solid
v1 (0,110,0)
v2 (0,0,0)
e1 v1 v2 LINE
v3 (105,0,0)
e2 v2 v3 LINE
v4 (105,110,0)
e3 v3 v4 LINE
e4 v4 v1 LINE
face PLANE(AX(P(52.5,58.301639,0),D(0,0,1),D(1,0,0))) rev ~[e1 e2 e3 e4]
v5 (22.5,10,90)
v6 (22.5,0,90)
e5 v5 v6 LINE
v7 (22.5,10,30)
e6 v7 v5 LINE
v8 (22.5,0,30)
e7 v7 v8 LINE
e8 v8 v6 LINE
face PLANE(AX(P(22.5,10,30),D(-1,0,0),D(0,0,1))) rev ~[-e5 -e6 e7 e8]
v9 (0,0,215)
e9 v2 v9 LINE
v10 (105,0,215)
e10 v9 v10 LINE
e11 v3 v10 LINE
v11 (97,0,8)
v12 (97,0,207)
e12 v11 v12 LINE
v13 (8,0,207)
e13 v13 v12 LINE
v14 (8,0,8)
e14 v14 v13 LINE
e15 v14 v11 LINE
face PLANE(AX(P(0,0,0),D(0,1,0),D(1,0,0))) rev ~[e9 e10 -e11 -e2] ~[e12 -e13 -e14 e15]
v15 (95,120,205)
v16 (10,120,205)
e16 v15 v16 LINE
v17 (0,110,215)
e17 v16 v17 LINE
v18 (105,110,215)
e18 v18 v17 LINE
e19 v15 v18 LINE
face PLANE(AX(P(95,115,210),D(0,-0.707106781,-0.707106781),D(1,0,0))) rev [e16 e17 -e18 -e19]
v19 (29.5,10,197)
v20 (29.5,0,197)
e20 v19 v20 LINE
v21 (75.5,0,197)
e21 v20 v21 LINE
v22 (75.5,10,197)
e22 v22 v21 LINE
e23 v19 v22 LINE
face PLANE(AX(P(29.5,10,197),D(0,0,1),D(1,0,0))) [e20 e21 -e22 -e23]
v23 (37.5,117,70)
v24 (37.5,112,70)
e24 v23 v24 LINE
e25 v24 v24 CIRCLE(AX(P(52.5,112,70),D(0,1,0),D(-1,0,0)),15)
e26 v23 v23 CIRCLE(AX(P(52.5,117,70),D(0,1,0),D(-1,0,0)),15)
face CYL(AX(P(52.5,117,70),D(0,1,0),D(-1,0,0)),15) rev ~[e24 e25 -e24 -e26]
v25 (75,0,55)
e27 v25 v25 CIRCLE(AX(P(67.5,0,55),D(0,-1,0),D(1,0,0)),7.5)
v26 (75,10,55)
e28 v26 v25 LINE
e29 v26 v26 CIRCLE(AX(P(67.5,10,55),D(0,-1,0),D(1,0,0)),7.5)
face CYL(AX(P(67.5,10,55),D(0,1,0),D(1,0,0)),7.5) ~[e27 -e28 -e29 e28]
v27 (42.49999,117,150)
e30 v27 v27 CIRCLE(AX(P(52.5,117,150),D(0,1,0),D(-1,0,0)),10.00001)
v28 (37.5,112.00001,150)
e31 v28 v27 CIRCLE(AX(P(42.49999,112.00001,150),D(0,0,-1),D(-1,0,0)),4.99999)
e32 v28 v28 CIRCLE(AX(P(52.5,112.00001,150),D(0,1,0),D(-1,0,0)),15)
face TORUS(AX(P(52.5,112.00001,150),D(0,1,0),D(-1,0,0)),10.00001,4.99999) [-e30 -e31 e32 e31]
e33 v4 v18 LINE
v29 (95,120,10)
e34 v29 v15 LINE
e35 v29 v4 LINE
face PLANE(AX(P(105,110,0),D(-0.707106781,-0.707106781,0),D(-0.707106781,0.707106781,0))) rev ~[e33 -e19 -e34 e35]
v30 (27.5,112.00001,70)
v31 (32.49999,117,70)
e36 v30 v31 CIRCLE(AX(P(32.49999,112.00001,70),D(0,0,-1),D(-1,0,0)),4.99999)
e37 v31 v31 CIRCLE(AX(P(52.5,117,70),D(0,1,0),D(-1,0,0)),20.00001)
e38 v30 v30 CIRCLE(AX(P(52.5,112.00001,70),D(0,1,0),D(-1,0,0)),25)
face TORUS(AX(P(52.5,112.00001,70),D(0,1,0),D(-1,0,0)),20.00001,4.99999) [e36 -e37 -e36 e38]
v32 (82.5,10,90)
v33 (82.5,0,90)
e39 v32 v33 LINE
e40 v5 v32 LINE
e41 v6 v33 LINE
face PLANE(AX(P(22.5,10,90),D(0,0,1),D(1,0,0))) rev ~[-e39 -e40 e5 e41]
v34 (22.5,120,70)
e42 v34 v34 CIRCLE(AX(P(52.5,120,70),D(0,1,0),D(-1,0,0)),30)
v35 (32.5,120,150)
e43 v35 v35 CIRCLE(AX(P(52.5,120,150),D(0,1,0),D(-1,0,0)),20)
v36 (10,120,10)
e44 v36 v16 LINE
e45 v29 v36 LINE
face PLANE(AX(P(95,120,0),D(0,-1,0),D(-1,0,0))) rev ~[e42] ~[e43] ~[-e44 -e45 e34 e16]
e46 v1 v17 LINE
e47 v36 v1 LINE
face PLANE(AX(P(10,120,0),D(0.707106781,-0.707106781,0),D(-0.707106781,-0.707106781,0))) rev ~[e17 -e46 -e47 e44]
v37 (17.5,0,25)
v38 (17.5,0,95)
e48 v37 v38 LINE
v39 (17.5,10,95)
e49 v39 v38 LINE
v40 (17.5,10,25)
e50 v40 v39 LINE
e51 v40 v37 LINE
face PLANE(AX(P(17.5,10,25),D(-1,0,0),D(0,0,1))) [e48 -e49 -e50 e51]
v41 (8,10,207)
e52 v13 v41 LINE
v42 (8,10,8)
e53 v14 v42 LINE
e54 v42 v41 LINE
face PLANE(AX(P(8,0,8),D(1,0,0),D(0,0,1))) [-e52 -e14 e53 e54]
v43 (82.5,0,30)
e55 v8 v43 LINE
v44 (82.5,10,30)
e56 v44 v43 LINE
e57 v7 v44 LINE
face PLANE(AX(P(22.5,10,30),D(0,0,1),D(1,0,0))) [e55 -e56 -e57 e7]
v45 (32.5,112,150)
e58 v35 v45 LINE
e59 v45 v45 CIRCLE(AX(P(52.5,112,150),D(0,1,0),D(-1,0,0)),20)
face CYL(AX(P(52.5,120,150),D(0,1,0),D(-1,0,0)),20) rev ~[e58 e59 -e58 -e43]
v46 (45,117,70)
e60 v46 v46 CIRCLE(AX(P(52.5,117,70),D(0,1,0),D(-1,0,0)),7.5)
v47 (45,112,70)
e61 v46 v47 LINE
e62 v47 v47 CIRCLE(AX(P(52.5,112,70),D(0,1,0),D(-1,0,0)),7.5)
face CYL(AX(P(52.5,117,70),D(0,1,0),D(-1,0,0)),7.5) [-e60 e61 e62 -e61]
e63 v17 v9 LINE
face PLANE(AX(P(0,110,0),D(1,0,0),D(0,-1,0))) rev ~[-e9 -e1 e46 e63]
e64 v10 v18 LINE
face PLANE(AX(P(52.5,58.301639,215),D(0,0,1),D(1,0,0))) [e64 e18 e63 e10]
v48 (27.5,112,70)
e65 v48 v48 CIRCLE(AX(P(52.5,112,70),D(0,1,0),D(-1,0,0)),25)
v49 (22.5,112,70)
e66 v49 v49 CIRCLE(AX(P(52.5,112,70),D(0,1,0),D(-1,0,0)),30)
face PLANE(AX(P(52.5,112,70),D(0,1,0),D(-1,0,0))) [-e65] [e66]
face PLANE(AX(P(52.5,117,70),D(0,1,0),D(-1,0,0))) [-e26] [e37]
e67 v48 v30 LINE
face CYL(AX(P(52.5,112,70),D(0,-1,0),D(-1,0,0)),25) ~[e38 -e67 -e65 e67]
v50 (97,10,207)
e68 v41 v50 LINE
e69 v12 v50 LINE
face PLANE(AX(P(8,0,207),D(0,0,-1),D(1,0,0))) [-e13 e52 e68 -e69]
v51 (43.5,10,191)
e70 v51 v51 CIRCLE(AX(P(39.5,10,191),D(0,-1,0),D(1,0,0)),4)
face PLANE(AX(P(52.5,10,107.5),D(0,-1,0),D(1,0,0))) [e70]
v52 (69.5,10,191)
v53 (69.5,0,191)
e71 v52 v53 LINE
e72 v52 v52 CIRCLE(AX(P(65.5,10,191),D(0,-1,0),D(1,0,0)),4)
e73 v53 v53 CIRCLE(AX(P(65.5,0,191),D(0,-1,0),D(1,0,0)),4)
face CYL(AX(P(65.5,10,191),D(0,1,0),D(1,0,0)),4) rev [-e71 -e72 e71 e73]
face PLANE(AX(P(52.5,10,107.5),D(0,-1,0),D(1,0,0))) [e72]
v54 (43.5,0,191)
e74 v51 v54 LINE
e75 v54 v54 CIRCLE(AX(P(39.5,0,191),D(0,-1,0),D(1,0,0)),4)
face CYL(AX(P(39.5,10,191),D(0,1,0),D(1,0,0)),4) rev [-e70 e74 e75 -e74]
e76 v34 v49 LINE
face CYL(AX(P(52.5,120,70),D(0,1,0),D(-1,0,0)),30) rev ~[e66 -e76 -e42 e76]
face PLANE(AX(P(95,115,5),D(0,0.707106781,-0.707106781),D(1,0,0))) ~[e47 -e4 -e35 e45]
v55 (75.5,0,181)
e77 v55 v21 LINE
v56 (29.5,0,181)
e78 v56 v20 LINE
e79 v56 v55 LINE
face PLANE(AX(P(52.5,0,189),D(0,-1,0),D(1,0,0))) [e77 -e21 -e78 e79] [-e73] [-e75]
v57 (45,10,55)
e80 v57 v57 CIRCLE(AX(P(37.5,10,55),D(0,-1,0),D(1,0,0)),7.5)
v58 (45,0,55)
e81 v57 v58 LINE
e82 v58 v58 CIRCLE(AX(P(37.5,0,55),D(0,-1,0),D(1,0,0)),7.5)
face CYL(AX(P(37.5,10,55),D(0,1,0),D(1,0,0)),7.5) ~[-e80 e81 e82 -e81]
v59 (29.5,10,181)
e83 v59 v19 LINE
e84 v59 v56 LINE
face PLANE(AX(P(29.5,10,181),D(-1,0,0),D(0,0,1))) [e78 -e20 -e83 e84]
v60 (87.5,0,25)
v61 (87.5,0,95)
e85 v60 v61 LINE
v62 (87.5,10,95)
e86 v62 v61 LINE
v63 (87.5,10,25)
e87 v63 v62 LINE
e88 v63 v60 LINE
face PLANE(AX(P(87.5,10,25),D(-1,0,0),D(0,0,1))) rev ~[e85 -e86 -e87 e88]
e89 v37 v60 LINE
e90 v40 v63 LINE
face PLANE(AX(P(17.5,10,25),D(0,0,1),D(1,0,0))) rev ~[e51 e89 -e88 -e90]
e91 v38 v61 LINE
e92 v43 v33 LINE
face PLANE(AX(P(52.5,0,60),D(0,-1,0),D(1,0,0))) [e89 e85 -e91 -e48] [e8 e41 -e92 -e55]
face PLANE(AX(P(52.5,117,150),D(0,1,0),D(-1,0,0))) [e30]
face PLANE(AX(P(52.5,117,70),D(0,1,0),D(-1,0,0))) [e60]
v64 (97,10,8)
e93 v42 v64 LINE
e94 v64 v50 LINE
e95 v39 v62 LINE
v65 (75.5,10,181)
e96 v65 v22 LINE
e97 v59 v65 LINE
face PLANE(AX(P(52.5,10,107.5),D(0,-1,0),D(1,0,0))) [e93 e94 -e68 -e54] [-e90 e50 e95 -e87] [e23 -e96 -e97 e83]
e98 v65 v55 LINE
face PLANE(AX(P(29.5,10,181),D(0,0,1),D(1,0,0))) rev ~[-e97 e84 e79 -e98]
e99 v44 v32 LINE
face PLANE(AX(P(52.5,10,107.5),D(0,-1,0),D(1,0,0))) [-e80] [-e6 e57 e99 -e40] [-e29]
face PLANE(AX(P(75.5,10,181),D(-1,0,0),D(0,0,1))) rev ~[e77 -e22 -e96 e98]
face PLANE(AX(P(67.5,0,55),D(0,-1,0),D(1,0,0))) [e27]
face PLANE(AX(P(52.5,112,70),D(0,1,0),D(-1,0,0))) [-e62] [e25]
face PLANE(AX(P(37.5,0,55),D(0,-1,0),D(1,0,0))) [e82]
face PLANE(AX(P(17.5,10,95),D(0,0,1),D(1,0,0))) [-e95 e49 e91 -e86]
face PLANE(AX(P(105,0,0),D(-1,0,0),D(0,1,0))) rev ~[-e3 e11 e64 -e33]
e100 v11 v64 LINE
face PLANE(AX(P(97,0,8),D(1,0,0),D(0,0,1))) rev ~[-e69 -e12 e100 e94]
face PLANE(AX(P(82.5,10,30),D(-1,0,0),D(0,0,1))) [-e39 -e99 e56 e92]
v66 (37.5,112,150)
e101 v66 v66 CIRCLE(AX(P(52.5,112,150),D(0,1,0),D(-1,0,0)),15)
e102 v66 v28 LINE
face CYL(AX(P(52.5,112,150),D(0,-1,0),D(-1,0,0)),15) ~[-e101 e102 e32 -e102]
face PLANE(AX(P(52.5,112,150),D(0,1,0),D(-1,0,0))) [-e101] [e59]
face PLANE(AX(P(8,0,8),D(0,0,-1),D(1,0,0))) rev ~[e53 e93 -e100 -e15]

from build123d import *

# Parameters (mm, degrees)
F1_DEPTH  = 215
F2_SIZE   = 10
F3_R      = 20
F3_R_2    = 30
F4_DEPTH  = 8
F5_R      = 15
F5_R_2    = 25
F6_DEPTH  = 5
F7_R      = 4.99999
F8_R      = 15
F8_R_2    = 7.5
F9_DEPTH  = 5
F10_W     = 89
F10_H     = 199
F11_DEPTH = 10
F12_W     = 46
F12_H     = 16
F12_R     = 4
F13_DEPTH = 10
F14_W     = 70
F14_H     = 70
F14_W_2   = 60
F14_H_2   = 60
F14_R     = 7.5
F15_DEPTH = 10


# Not quite as in the source:
# - a fillet or chamfer is up to 0.001 mm smaller than in the source, because OpenCascade refuses the exact size


with BuildPart() as f1:
    # F0 (on Top) → F1 (new body)
    with BuildSketch(Plane.XY):
        Polygon((0, 110), (0, 0), (105, 0), (105, 110), (95, 120), (10, 120), align=None)
    extrude(amount=F1_DEPTH)

    # F2
    f2_edges = [f1.edges().sort_by_distance(p)[0] for p in [
        (52.5, 120, 215),
        (52.5, 120, 0),
    ]]
    chamfer(f2_edges, length=F2_SIZE)

    # F3 (on face) → F4 (cut)
    with BuildSketch(Plane(origin=(0, 120, 0), x_dir=(-1, 0, 0), z_dir=(0, 1, 0))):
        with Locations((-52.5, 150)):
            Circle(F3_R)
        with Locations((-52.5, 70)):
            Circle(F3_R_2)
    extrude(amount=-F4_DEPTH, mode=Mode.SUBTRACT)

    # F5 (on face) → F6 (join)
    with BuildSketch(Plane(origin=(0, 112, 0), x_dir=(-1, 0, 0), z_dir=(0, 1, 0))):
        with Locations((-52.5, 150)):
            Circle(F5_R)
        with Locations((-52.5, 70)):
            Circle(F5_R_2)
    extrude(amount=F6_DEPTH)

    # F7 (radius 5 in the source; OpenCascade refuses exactly that, so slightly less here)
    f7_edges = [f1.edges().sort_by_distance(p)[0] for p in [
        (77.5, 117, 70),
        (67.5, 117, 150),
    ]]
    fillet(f7_edges, radius=F7_R)

    # F8 (on face) → F9 (cut)
    with BuildSketch(Plane(origin=(0, 117, 0), x_dir=(-1, 0, 0), z_dir=(0, 1, 0))):
        with Locations((-52.5, 70)):
            Circle(F8_R)
        with Locations((-52.5, 70)):
            Circle(F8_R_2, mode=Mode.SUBTRACT)
    extrude(amount=-F9_DEPTH, mode=Mode.SUBTRACT)

    # F10 (on face) → F11 (cut)
    with BuildSketch(Plane.XZ):
        with Locations((52.5, 107.5)):
            Rectangle(F10_W, F10_H)
    extrude(amount=-F11_DEPTH, mode=Mode.SUBTRACT)

    # F12 (on face) → F13 (join)
    with BuildSketch(Plane.XZ.offset(-10)):
        with Locations((52.5, 189)):
            Rectangle(F12_W, F12_H)
        with Locations((39.5, 191)):
            Circle(F12_R, mode=Mode.SUBTRACT)
        with Locations((65.5, 191)):
            Circle(F12_R, mode=Mode.SUBTRACT)
    extrude(amount=F13_DEPTH)

    # F14 (on face) → F15 (join)
    with BuildSketch(Plane.XZ.offset(-10)):
        with Locations((52.5, 60)):
            Rectangle(F14_W, F14_H)
        with Locations((52.5, 60)):
            Rectangle(F14_W_2, F14_H_2, mode=Mode.SUBTRACT)
        with Locations((67.5, 55)):
            Circle(F14_R)
        with Locations((37.5, 55)):
            Circle(F14_R)
    extrude(amount=F15_DEPTH)


solid = f1.part
